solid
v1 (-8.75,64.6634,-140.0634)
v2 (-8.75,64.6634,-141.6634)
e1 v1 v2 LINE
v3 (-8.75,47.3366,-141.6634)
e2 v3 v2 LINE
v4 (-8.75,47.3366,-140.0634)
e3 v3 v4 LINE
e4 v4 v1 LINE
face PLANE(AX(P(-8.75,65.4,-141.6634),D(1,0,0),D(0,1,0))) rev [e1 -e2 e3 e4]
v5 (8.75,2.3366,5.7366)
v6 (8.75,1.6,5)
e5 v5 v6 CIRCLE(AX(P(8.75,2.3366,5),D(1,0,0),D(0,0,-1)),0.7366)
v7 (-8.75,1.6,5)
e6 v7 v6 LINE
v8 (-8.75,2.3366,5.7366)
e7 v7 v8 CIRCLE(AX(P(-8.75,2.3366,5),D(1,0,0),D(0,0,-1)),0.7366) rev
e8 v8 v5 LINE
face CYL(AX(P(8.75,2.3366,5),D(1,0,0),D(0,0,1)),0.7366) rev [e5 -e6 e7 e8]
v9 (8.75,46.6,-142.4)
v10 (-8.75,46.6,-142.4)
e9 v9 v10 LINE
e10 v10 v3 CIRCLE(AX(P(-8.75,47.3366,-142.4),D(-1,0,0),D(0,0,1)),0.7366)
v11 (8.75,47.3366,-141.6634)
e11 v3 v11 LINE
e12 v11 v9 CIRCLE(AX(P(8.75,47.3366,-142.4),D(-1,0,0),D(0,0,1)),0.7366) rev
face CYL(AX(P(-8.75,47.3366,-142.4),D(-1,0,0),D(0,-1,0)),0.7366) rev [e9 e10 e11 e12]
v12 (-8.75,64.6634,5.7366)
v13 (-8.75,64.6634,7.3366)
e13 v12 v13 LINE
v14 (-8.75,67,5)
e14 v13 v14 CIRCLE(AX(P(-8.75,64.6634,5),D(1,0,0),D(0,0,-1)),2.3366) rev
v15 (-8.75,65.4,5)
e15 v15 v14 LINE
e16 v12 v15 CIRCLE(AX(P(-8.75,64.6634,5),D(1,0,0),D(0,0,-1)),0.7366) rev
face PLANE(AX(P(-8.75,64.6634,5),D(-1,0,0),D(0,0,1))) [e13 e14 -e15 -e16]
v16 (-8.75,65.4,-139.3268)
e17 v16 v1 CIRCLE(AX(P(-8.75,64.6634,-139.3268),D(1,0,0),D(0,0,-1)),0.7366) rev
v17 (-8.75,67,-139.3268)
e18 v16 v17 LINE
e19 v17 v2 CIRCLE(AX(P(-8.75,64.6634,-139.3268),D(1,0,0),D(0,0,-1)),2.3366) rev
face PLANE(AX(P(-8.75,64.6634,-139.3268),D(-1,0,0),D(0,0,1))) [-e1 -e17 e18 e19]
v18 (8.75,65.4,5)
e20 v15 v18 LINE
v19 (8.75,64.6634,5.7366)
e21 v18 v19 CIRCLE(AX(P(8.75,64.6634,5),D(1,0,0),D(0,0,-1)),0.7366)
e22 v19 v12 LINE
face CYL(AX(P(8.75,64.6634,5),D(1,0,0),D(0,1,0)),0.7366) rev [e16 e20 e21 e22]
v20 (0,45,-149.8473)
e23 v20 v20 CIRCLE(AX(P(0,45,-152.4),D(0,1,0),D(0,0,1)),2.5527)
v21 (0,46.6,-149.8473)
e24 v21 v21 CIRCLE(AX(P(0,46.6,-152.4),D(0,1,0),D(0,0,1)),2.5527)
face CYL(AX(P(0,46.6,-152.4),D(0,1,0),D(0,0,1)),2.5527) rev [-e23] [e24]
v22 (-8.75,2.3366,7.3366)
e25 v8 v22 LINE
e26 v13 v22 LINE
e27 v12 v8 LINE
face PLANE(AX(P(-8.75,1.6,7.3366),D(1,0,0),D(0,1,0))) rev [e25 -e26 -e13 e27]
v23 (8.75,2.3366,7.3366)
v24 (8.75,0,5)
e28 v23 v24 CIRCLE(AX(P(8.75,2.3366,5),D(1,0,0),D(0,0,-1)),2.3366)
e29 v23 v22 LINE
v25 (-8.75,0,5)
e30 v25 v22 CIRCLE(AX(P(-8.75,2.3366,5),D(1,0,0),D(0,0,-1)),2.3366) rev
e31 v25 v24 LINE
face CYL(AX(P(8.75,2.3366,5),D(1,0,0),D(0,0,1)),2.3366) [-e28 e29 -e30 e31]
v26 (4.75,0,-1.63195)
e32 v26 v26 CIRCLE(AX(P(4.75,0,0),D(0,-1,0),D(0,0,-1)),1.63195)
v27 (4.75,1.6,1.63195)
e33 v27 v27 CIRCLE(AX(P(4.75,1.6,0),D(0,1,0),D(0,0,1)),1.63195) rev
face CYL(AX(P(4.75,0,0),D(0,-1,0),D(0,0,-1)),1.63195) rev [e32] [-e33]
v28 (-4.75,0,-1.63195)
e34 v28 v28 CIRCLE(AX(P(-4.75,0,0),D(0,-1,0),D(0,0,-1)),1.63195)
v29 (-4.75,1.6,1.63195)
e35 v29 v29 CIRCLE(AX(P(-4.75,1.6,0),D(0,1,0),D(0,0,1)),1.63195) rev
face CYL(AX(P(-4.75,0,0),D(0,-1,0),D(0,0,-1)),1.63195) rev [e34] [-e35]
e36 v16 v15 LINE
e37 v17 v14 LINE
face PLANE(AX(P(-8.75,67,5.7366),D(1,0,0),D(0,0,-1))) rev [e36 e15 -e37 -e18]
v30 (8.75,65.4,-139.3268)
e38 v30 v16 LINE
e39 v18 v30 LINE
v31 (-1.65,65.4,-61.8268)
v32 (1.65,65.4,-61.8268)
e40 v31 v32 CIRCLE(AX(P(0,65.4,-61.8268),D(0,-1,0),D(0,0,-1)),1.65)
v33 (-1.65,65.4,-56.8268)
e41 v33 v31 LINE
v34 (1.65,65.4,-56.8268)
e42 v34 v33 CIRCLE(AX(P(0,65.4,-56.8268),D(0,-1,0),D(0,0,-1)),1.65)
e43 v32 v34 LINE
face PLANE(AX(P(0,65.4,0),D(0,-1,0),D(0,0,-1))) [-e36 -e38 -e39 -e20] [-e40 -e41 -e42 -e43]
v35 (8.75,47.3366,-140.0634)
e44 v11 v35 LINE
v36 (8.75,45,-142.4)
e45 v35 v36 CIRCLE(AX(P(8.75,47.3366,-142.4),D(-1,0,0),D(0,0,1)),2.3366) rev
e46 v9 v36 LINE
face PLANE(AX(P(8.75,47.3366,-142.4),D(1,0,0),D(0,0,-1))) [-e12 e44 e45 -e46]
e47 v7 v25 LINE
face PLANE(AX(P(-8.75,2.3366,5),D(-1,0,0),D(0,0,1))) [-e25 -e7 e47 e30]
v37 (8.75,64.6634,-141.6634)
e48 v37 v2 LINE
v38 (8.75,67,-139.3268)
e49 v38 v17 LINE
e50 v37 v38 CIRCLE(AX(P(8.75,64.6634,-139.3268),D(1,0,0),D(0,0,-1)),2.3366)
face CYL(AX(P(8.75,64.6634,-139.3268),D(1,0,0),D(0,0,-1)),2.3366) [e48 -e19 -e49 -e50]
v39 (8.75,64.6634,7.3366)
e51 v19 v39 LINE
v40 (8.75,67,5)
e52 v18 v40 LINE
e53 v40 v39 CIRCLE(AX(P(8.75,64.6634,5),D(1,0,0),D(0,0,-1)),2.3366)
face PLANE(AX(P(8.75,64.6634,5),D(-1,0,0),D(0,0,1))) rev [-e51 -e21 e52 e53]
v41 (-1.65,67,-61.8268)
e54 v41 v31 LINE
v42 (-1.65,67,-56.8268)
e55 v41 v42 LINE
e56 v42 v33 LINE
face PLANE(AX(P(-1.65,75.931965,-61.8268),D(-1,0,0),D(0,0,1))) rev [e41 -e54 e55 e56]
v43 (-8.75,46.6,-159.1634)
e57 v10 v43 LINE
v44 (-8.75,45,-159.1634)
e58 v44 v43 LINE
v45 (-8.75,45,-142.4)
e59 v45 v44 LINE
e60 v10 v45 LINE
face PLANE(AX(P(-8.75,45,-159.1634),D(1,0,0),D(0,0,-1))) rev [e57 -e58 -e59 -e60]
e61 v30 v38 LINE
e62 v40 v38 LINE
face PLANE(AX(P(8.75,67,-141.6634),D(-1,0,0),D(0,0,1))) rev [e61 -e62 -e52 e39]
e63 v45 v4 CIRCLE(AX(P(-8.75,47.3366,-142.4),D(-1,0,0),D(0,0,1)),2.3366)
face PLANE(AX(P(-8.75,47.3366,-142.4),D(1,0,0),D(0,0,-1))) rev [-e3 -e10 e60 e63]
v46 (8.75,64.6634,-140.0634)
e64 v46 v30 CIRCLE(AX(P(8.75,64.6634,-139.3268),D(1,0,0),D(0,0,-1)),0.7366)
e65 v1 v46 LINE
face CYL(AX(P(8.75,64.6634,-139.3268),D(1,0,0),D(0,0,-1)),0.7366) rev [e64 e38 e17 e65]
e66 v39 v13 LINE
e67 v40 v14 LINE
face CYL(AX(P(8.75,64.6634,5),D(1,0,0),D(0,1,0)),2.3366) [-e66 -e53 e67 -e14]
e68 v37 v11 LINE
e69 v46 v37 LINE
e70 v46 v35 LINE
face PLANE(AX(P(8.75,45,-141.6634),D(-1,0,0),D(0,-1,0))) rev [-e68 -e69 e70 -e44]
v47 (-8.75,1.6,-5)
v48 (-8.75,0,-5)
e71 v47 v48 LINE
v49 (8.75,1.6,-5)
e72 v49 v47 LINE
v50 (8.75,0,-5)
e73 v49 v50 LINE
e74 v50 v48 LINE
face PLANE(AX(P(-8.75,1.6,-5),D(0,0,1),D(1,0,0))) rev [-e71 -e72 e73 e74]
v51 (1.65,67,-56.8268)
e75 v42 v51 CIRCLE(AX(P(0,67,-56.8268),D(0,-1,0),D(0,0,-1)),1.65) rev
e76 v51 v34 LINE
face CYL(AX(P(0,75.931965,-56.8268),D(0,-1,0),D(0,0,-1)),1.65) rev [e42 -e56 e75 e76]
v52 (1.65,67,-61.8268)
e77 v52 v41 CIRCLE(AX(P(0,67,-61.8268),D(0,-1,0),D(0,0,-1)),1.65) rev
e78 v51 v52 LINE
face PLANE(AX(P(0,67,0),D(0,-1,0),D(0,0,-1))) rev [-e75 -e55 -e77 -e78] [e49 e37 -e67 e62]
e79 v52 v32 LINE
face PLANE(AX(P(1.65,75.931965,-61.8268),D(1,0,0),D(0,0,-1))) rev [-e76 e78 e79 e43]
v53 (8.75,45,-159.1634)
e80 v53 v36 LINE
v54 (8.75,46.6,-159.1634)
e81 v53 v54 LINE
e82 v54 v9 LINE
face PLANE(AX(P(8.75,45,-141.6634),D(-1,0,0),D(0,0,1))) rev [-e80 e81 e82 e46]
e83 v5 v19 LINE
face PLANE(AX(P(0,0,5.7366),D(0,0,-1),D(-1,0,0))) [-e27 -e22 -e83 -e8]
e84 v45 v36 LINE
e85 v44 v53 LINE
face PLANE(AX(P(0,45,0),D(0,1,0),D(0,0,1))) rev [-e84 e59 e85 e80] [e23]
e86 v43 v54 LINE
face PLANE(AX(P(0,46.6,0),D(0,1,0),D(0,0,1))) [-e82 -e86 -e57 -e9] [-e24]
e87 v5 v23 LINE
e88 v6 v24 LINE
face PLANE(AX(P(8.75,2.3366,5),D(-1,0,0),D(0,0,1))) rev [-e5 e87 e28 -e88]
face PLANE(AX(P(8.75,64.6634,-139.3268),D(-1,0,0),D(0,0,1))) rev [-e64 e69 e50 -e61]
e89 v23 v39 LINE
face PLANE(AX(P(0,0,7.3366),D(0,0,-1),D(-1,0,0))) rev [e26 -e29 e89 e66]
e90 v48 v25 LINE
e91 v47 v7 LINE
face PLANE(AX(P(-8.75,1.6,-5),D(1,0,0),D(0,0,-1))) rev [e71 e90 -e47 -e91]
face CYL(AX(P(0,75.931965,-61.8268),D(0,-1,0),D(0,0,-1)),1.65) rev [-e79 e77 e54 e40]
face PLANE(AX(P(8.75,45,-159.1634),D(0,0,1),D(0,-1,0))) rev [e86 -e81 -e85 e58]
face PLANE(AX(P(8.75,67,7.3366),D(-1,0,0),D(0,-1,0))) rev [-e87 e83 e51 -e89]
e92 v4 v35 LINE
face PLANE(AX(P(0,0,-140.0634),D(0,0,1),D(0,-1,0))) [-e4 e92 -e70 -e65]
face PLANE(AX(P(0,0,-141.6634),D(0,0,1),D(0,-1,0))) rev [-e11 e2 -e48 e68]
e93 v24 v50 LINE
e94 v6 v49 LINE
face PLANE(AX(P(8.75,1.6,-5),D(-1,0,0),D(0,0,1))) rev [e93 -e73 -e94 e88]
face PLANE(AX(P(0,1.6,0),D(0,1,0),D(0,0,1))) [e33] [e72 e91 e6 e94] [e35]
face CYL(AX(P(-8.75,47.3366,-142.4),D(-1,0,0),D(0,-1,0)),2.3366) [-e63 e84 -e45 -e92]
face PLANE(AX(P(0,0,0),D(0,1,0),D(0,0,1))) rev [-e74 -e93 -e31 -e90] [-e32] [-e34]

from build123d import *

# Parameters (mm, degrees)
SKETCH1_W                    = 17.5
SKETCH1_H                    = 10
BASE_FLANGE1_DEPTH           = 1.6
EDGE_FLANGE1_DEPTH           = 17.5
EDGE_FLANGE2_STRIP_W         = 7.8732
EDGE_FLANGE2_STRIP_H         = 1.6
EDGE_FLANGE2_STRIP_CUT_DEPTH = 17.5
EDGE_FLANGE2_DEPTH           = 17.5
EDGE_FLANGE3_STRIP_W         = 7.8732
EDGE_FLANGE3_STRIP_H         = 1.6
EDGE_FLANGE3_STRIP_CUT_DEPTH = 17.5
EDGE_FLANGE3_DEPTH           = 17.5
F_4_CLEARANCE_HOLE1_D        = 3.2639
F_4_CLEARANCE_HOLE1_DEPTH    = 1.6
F_4_CLEARANCE_HOLE1_TIP      = 0.980574487
CUT_EXTRUDE3_DEPTH           = 1.6
EDGE_FLANGE4_STRIP_W         = 7.8732
EDGE_FLANGE4_STRIP_H         = 1.6
EDGE_FLANGE4_STRIP_CUT_DEPTH = 17.5
EDGE_FLANGE4_DEPTH           = 17.5
F_10_CLEARANCE_HOLE1_D       = 5.1054
F_10_CLEARANCE_HOLE1_DEPTH   = 7.6
F_10_CLEARANCE_HOLE1_TIP     = 1.533816902


# Sheet-metal steps are written as plain solids
with BuildPart() as part:
    # Sketch1 → Base-Flange1 (new body)
    with BuildSketch(Plane(origin=(0, 0, 0), x_dir=(1, 0, 0), z_dir=(0, 1, 0))):
        Rectangle(SKETCH1_W, SKETCH1_H)
    extrude(amount=BASE_FLANGE1_DEPTH)

    # Edge-Flange1 section (across the edge) → Edge-Flange1 (add)
    with BuildSketch(Plane(origin=(-8.75, 1.6, 5.7366), x_dir=(0, 0, -1), z_dir=(1, 0, 0))):
        with BuildLine():
            Line((-1.6, 0.7366), (-1.6, 65.4))
            Line((-1.6, 65.4), (0, 65.4))
            Line((0, 65.4), (0, 0.7366))
            ThreePointArc((0, 0.7366), (0.215745145, 0.215745145), (0.7366, 0))
            Line((0.7366, 0), (0.7366, -1.6))
            ThreePointArc((0.7366, -1.6), (-0.915625705, -0.915625705), (-1.6, 0.7366))
        make_face()
    extrude(amount=EDGE_FLANGE1_DEPTH)

    # Edge-Flange2 strip (across the edge) → Edge-Flange2 strip cut (cut)
    with BuildSketch(Plane(origin=(-8.75, 67, 5.7366), x_dir=(0, -1, 0), z_dir=(1, 0, 0))):
        with Locations((-1.6, -0.8)):
            Rectangle(EDGE_FLANGE2_STRIP_W, EDGE_FLANGE2_STRIP_H)
    extrude(amount=EDGE_FLANGE2_STRIP_CUT_DEPTH, mode=Mode.SUBTRACT)

    # Edge-Flange2 section (across the edge) → Edge-Flange2 (add)
    with BuildSketch(Plane(origin=(-8.75, 67, 5.7366), x_dir=(0, -1, 0), z_dir=(1, 0, 0))):
        with BuildLine():
            Line((0, 0.7366), (0, 147.4))
            Line((0, 147.4), (1.6, 147.4))
            Line((1.6, 147.4), (1.6, 0.7366))
            ThreePointArc((1.6, 0.7366), (1.815745145, 0.215745145), (2.3366, 0))
            Line((2.3366, 0), (2.3366, -1.6))
            ThreePointArc((2.3366, -1.6), (0.684374295, -0.915625705), (0, 0.7366))
        make_face()
    extrude(amount=EDGE_FLANGE2_DEPTH)

    # Edge-Flange3 strip (across the edge) → Edge-Flange3 strip cut (cut)
    with BuildSketch(Plane(origin=(-8.75, 65.4, -141.6634), x_dir=(0, 0, 1), z_dir=(1, 0, 0))):
        with Locations((-1.6, -0.8)):
            Rectangle(EDGE_FLANGE3_STRIP_W, EDGE_FLANGE3_STRIP_H)
    extrude(amount=EDGE_FLANGE3_STRIP_CUT_DEPTH, mode=Mode.SUBTRACT)

    # Edge-Flange3 section (across the edge) → Edge-Flange3 (add)
    with BuildSketch(Plane(origin=(-8.75, 65.4, -141.6634), x_dir=(0, 0, 1), z_dir=(1, 0, 0))):
        with BuildLine():
            Line((0, 0.7366), (0, 20.4))
            Line((0, 20.4), (1.6, 20.4))
            Line((1.6, 20.4), (1.6, 0.7366))
            ThreePointArc((1.6, 0.7366), (1.815745145, 0.215745145), (2.3366, 0))
            Line((2.3366, 0), (2.3366, -1.6))
            ThreePointArc((2.3366, -1.6), (0.684374295, -0.915625705), (0, 0.7366))
        make_face()
    extrude(amount=EDGE_FLANGE3_DEPTH)

    # #4 Clearance Hole1
    with Locations(Plane.XZ):
        with Locations((4.75, 0), (-4.75, 0)):
            Hole(F_4_CLEARANCE_HOLE1_D / 2, depth=F_4_CLEARANCE_HOLE1_DEPTH)
            with Locations((0, 0, -(F_4_CLEARANCE_HOLE1_DEPTH + F_4_CLEARANCE_HOLE1_TIP / 2))):  # 118° drill point
                Cone(0, F_4_CLEARANCE_HOLE1_D / 2, F_4_CLEARANCE_HOLE1_TIP, mode=Mode.SUBTRACT)

    # Sketch23 → Cut-Extrude3 (cut)
    with BuildSketch(Plane.XZ.offset(-65.4)):
        with BuildLine():
            Line((-1.65, -61.8268), (-1.65, -56.8268))
            ThreePointArc((-1.65, -56.8268), (0, -55.1768), (1.65, -56.8268))
            Line((1.65, -56.8268), (1.65, -61.8268))
            ThreePointArc((1.65, -61.8268), (0, -63.4768), (-1.65, -61.8268))
        make_face()
    extrude(amount=-CUT_EXTRUDE3_DEPTH, mode=Mode.SUBTRACT)

    # Edge-Flange4 strip (across the edge) → Edge-Flange4 strip cut (cut)
    with BuildSketch(Plane(origin=(8.75, 45, -141.6634), x_dir=(0, 1, 0), z_dir=(-1, 0, 0))):
        with Locations((-1.6, -0.8)):
            Rectangle(EDGE_FLANGE4_STRIP_W, EDGE_FLANGE4_STRIP_H)
    extrude(amount=EDGE_FLANGE4_STRIP_CUT_DEPTH, mode=Mode.SUBTRACT)

    # Edge-Flange4 section (across the edge) → Edge-Flange4 (add)
    with BuildSketch(Plane(origin=(8.75, 45, -141.6634), x_dir=(0, 1, 0), z_dir=(-1, 0, 0))):
        with BuildLine():
            Line((0, 0.7366), (0, 17.5))
            Line((0, 17.5), (1.6, 17.5))
            Line((1.6, 17.5), (1.6, 0.7366))
            ThreePointArc((1.6, 0.7366), (1.815745145, 0.215745145), (2.3366, 0))
            Line((2.3366, 0), (2.3366, -1.6))
            ThreePointArc((2.3366, -1.6), (0.684374295, -0.915625705), (0, 0.7366))
        make_face()
    extrude(amount=EDGE_FLANGE4_DEPTH)

    # #10 Clearance Hole1
    with Locations(Plane(origin=(0, 46.6, 0), x_dir=(1, 0, 0), z_dir=(0, 1, 0))):
        with Locations((0, 152.4)):
            Hole(F_10_CLEARANCE_HOLE1_D / 2, depth=F_10_CLEARANCE_HOLE1_DEPTH)
            with Locations((0, 0, -(F_10_CLEARANCE_HOLE1_DEPTH + F_10_CLEARANCE_HOLE1_TIP / 2))):  # 118° drill point
                Cone(0, F_10_CLEARANCE_HOLE1_D / 2, F_10_CLEARANCE_HOLE1_TIP, mode=Mode.SUBTRACT)


solid = part.part
